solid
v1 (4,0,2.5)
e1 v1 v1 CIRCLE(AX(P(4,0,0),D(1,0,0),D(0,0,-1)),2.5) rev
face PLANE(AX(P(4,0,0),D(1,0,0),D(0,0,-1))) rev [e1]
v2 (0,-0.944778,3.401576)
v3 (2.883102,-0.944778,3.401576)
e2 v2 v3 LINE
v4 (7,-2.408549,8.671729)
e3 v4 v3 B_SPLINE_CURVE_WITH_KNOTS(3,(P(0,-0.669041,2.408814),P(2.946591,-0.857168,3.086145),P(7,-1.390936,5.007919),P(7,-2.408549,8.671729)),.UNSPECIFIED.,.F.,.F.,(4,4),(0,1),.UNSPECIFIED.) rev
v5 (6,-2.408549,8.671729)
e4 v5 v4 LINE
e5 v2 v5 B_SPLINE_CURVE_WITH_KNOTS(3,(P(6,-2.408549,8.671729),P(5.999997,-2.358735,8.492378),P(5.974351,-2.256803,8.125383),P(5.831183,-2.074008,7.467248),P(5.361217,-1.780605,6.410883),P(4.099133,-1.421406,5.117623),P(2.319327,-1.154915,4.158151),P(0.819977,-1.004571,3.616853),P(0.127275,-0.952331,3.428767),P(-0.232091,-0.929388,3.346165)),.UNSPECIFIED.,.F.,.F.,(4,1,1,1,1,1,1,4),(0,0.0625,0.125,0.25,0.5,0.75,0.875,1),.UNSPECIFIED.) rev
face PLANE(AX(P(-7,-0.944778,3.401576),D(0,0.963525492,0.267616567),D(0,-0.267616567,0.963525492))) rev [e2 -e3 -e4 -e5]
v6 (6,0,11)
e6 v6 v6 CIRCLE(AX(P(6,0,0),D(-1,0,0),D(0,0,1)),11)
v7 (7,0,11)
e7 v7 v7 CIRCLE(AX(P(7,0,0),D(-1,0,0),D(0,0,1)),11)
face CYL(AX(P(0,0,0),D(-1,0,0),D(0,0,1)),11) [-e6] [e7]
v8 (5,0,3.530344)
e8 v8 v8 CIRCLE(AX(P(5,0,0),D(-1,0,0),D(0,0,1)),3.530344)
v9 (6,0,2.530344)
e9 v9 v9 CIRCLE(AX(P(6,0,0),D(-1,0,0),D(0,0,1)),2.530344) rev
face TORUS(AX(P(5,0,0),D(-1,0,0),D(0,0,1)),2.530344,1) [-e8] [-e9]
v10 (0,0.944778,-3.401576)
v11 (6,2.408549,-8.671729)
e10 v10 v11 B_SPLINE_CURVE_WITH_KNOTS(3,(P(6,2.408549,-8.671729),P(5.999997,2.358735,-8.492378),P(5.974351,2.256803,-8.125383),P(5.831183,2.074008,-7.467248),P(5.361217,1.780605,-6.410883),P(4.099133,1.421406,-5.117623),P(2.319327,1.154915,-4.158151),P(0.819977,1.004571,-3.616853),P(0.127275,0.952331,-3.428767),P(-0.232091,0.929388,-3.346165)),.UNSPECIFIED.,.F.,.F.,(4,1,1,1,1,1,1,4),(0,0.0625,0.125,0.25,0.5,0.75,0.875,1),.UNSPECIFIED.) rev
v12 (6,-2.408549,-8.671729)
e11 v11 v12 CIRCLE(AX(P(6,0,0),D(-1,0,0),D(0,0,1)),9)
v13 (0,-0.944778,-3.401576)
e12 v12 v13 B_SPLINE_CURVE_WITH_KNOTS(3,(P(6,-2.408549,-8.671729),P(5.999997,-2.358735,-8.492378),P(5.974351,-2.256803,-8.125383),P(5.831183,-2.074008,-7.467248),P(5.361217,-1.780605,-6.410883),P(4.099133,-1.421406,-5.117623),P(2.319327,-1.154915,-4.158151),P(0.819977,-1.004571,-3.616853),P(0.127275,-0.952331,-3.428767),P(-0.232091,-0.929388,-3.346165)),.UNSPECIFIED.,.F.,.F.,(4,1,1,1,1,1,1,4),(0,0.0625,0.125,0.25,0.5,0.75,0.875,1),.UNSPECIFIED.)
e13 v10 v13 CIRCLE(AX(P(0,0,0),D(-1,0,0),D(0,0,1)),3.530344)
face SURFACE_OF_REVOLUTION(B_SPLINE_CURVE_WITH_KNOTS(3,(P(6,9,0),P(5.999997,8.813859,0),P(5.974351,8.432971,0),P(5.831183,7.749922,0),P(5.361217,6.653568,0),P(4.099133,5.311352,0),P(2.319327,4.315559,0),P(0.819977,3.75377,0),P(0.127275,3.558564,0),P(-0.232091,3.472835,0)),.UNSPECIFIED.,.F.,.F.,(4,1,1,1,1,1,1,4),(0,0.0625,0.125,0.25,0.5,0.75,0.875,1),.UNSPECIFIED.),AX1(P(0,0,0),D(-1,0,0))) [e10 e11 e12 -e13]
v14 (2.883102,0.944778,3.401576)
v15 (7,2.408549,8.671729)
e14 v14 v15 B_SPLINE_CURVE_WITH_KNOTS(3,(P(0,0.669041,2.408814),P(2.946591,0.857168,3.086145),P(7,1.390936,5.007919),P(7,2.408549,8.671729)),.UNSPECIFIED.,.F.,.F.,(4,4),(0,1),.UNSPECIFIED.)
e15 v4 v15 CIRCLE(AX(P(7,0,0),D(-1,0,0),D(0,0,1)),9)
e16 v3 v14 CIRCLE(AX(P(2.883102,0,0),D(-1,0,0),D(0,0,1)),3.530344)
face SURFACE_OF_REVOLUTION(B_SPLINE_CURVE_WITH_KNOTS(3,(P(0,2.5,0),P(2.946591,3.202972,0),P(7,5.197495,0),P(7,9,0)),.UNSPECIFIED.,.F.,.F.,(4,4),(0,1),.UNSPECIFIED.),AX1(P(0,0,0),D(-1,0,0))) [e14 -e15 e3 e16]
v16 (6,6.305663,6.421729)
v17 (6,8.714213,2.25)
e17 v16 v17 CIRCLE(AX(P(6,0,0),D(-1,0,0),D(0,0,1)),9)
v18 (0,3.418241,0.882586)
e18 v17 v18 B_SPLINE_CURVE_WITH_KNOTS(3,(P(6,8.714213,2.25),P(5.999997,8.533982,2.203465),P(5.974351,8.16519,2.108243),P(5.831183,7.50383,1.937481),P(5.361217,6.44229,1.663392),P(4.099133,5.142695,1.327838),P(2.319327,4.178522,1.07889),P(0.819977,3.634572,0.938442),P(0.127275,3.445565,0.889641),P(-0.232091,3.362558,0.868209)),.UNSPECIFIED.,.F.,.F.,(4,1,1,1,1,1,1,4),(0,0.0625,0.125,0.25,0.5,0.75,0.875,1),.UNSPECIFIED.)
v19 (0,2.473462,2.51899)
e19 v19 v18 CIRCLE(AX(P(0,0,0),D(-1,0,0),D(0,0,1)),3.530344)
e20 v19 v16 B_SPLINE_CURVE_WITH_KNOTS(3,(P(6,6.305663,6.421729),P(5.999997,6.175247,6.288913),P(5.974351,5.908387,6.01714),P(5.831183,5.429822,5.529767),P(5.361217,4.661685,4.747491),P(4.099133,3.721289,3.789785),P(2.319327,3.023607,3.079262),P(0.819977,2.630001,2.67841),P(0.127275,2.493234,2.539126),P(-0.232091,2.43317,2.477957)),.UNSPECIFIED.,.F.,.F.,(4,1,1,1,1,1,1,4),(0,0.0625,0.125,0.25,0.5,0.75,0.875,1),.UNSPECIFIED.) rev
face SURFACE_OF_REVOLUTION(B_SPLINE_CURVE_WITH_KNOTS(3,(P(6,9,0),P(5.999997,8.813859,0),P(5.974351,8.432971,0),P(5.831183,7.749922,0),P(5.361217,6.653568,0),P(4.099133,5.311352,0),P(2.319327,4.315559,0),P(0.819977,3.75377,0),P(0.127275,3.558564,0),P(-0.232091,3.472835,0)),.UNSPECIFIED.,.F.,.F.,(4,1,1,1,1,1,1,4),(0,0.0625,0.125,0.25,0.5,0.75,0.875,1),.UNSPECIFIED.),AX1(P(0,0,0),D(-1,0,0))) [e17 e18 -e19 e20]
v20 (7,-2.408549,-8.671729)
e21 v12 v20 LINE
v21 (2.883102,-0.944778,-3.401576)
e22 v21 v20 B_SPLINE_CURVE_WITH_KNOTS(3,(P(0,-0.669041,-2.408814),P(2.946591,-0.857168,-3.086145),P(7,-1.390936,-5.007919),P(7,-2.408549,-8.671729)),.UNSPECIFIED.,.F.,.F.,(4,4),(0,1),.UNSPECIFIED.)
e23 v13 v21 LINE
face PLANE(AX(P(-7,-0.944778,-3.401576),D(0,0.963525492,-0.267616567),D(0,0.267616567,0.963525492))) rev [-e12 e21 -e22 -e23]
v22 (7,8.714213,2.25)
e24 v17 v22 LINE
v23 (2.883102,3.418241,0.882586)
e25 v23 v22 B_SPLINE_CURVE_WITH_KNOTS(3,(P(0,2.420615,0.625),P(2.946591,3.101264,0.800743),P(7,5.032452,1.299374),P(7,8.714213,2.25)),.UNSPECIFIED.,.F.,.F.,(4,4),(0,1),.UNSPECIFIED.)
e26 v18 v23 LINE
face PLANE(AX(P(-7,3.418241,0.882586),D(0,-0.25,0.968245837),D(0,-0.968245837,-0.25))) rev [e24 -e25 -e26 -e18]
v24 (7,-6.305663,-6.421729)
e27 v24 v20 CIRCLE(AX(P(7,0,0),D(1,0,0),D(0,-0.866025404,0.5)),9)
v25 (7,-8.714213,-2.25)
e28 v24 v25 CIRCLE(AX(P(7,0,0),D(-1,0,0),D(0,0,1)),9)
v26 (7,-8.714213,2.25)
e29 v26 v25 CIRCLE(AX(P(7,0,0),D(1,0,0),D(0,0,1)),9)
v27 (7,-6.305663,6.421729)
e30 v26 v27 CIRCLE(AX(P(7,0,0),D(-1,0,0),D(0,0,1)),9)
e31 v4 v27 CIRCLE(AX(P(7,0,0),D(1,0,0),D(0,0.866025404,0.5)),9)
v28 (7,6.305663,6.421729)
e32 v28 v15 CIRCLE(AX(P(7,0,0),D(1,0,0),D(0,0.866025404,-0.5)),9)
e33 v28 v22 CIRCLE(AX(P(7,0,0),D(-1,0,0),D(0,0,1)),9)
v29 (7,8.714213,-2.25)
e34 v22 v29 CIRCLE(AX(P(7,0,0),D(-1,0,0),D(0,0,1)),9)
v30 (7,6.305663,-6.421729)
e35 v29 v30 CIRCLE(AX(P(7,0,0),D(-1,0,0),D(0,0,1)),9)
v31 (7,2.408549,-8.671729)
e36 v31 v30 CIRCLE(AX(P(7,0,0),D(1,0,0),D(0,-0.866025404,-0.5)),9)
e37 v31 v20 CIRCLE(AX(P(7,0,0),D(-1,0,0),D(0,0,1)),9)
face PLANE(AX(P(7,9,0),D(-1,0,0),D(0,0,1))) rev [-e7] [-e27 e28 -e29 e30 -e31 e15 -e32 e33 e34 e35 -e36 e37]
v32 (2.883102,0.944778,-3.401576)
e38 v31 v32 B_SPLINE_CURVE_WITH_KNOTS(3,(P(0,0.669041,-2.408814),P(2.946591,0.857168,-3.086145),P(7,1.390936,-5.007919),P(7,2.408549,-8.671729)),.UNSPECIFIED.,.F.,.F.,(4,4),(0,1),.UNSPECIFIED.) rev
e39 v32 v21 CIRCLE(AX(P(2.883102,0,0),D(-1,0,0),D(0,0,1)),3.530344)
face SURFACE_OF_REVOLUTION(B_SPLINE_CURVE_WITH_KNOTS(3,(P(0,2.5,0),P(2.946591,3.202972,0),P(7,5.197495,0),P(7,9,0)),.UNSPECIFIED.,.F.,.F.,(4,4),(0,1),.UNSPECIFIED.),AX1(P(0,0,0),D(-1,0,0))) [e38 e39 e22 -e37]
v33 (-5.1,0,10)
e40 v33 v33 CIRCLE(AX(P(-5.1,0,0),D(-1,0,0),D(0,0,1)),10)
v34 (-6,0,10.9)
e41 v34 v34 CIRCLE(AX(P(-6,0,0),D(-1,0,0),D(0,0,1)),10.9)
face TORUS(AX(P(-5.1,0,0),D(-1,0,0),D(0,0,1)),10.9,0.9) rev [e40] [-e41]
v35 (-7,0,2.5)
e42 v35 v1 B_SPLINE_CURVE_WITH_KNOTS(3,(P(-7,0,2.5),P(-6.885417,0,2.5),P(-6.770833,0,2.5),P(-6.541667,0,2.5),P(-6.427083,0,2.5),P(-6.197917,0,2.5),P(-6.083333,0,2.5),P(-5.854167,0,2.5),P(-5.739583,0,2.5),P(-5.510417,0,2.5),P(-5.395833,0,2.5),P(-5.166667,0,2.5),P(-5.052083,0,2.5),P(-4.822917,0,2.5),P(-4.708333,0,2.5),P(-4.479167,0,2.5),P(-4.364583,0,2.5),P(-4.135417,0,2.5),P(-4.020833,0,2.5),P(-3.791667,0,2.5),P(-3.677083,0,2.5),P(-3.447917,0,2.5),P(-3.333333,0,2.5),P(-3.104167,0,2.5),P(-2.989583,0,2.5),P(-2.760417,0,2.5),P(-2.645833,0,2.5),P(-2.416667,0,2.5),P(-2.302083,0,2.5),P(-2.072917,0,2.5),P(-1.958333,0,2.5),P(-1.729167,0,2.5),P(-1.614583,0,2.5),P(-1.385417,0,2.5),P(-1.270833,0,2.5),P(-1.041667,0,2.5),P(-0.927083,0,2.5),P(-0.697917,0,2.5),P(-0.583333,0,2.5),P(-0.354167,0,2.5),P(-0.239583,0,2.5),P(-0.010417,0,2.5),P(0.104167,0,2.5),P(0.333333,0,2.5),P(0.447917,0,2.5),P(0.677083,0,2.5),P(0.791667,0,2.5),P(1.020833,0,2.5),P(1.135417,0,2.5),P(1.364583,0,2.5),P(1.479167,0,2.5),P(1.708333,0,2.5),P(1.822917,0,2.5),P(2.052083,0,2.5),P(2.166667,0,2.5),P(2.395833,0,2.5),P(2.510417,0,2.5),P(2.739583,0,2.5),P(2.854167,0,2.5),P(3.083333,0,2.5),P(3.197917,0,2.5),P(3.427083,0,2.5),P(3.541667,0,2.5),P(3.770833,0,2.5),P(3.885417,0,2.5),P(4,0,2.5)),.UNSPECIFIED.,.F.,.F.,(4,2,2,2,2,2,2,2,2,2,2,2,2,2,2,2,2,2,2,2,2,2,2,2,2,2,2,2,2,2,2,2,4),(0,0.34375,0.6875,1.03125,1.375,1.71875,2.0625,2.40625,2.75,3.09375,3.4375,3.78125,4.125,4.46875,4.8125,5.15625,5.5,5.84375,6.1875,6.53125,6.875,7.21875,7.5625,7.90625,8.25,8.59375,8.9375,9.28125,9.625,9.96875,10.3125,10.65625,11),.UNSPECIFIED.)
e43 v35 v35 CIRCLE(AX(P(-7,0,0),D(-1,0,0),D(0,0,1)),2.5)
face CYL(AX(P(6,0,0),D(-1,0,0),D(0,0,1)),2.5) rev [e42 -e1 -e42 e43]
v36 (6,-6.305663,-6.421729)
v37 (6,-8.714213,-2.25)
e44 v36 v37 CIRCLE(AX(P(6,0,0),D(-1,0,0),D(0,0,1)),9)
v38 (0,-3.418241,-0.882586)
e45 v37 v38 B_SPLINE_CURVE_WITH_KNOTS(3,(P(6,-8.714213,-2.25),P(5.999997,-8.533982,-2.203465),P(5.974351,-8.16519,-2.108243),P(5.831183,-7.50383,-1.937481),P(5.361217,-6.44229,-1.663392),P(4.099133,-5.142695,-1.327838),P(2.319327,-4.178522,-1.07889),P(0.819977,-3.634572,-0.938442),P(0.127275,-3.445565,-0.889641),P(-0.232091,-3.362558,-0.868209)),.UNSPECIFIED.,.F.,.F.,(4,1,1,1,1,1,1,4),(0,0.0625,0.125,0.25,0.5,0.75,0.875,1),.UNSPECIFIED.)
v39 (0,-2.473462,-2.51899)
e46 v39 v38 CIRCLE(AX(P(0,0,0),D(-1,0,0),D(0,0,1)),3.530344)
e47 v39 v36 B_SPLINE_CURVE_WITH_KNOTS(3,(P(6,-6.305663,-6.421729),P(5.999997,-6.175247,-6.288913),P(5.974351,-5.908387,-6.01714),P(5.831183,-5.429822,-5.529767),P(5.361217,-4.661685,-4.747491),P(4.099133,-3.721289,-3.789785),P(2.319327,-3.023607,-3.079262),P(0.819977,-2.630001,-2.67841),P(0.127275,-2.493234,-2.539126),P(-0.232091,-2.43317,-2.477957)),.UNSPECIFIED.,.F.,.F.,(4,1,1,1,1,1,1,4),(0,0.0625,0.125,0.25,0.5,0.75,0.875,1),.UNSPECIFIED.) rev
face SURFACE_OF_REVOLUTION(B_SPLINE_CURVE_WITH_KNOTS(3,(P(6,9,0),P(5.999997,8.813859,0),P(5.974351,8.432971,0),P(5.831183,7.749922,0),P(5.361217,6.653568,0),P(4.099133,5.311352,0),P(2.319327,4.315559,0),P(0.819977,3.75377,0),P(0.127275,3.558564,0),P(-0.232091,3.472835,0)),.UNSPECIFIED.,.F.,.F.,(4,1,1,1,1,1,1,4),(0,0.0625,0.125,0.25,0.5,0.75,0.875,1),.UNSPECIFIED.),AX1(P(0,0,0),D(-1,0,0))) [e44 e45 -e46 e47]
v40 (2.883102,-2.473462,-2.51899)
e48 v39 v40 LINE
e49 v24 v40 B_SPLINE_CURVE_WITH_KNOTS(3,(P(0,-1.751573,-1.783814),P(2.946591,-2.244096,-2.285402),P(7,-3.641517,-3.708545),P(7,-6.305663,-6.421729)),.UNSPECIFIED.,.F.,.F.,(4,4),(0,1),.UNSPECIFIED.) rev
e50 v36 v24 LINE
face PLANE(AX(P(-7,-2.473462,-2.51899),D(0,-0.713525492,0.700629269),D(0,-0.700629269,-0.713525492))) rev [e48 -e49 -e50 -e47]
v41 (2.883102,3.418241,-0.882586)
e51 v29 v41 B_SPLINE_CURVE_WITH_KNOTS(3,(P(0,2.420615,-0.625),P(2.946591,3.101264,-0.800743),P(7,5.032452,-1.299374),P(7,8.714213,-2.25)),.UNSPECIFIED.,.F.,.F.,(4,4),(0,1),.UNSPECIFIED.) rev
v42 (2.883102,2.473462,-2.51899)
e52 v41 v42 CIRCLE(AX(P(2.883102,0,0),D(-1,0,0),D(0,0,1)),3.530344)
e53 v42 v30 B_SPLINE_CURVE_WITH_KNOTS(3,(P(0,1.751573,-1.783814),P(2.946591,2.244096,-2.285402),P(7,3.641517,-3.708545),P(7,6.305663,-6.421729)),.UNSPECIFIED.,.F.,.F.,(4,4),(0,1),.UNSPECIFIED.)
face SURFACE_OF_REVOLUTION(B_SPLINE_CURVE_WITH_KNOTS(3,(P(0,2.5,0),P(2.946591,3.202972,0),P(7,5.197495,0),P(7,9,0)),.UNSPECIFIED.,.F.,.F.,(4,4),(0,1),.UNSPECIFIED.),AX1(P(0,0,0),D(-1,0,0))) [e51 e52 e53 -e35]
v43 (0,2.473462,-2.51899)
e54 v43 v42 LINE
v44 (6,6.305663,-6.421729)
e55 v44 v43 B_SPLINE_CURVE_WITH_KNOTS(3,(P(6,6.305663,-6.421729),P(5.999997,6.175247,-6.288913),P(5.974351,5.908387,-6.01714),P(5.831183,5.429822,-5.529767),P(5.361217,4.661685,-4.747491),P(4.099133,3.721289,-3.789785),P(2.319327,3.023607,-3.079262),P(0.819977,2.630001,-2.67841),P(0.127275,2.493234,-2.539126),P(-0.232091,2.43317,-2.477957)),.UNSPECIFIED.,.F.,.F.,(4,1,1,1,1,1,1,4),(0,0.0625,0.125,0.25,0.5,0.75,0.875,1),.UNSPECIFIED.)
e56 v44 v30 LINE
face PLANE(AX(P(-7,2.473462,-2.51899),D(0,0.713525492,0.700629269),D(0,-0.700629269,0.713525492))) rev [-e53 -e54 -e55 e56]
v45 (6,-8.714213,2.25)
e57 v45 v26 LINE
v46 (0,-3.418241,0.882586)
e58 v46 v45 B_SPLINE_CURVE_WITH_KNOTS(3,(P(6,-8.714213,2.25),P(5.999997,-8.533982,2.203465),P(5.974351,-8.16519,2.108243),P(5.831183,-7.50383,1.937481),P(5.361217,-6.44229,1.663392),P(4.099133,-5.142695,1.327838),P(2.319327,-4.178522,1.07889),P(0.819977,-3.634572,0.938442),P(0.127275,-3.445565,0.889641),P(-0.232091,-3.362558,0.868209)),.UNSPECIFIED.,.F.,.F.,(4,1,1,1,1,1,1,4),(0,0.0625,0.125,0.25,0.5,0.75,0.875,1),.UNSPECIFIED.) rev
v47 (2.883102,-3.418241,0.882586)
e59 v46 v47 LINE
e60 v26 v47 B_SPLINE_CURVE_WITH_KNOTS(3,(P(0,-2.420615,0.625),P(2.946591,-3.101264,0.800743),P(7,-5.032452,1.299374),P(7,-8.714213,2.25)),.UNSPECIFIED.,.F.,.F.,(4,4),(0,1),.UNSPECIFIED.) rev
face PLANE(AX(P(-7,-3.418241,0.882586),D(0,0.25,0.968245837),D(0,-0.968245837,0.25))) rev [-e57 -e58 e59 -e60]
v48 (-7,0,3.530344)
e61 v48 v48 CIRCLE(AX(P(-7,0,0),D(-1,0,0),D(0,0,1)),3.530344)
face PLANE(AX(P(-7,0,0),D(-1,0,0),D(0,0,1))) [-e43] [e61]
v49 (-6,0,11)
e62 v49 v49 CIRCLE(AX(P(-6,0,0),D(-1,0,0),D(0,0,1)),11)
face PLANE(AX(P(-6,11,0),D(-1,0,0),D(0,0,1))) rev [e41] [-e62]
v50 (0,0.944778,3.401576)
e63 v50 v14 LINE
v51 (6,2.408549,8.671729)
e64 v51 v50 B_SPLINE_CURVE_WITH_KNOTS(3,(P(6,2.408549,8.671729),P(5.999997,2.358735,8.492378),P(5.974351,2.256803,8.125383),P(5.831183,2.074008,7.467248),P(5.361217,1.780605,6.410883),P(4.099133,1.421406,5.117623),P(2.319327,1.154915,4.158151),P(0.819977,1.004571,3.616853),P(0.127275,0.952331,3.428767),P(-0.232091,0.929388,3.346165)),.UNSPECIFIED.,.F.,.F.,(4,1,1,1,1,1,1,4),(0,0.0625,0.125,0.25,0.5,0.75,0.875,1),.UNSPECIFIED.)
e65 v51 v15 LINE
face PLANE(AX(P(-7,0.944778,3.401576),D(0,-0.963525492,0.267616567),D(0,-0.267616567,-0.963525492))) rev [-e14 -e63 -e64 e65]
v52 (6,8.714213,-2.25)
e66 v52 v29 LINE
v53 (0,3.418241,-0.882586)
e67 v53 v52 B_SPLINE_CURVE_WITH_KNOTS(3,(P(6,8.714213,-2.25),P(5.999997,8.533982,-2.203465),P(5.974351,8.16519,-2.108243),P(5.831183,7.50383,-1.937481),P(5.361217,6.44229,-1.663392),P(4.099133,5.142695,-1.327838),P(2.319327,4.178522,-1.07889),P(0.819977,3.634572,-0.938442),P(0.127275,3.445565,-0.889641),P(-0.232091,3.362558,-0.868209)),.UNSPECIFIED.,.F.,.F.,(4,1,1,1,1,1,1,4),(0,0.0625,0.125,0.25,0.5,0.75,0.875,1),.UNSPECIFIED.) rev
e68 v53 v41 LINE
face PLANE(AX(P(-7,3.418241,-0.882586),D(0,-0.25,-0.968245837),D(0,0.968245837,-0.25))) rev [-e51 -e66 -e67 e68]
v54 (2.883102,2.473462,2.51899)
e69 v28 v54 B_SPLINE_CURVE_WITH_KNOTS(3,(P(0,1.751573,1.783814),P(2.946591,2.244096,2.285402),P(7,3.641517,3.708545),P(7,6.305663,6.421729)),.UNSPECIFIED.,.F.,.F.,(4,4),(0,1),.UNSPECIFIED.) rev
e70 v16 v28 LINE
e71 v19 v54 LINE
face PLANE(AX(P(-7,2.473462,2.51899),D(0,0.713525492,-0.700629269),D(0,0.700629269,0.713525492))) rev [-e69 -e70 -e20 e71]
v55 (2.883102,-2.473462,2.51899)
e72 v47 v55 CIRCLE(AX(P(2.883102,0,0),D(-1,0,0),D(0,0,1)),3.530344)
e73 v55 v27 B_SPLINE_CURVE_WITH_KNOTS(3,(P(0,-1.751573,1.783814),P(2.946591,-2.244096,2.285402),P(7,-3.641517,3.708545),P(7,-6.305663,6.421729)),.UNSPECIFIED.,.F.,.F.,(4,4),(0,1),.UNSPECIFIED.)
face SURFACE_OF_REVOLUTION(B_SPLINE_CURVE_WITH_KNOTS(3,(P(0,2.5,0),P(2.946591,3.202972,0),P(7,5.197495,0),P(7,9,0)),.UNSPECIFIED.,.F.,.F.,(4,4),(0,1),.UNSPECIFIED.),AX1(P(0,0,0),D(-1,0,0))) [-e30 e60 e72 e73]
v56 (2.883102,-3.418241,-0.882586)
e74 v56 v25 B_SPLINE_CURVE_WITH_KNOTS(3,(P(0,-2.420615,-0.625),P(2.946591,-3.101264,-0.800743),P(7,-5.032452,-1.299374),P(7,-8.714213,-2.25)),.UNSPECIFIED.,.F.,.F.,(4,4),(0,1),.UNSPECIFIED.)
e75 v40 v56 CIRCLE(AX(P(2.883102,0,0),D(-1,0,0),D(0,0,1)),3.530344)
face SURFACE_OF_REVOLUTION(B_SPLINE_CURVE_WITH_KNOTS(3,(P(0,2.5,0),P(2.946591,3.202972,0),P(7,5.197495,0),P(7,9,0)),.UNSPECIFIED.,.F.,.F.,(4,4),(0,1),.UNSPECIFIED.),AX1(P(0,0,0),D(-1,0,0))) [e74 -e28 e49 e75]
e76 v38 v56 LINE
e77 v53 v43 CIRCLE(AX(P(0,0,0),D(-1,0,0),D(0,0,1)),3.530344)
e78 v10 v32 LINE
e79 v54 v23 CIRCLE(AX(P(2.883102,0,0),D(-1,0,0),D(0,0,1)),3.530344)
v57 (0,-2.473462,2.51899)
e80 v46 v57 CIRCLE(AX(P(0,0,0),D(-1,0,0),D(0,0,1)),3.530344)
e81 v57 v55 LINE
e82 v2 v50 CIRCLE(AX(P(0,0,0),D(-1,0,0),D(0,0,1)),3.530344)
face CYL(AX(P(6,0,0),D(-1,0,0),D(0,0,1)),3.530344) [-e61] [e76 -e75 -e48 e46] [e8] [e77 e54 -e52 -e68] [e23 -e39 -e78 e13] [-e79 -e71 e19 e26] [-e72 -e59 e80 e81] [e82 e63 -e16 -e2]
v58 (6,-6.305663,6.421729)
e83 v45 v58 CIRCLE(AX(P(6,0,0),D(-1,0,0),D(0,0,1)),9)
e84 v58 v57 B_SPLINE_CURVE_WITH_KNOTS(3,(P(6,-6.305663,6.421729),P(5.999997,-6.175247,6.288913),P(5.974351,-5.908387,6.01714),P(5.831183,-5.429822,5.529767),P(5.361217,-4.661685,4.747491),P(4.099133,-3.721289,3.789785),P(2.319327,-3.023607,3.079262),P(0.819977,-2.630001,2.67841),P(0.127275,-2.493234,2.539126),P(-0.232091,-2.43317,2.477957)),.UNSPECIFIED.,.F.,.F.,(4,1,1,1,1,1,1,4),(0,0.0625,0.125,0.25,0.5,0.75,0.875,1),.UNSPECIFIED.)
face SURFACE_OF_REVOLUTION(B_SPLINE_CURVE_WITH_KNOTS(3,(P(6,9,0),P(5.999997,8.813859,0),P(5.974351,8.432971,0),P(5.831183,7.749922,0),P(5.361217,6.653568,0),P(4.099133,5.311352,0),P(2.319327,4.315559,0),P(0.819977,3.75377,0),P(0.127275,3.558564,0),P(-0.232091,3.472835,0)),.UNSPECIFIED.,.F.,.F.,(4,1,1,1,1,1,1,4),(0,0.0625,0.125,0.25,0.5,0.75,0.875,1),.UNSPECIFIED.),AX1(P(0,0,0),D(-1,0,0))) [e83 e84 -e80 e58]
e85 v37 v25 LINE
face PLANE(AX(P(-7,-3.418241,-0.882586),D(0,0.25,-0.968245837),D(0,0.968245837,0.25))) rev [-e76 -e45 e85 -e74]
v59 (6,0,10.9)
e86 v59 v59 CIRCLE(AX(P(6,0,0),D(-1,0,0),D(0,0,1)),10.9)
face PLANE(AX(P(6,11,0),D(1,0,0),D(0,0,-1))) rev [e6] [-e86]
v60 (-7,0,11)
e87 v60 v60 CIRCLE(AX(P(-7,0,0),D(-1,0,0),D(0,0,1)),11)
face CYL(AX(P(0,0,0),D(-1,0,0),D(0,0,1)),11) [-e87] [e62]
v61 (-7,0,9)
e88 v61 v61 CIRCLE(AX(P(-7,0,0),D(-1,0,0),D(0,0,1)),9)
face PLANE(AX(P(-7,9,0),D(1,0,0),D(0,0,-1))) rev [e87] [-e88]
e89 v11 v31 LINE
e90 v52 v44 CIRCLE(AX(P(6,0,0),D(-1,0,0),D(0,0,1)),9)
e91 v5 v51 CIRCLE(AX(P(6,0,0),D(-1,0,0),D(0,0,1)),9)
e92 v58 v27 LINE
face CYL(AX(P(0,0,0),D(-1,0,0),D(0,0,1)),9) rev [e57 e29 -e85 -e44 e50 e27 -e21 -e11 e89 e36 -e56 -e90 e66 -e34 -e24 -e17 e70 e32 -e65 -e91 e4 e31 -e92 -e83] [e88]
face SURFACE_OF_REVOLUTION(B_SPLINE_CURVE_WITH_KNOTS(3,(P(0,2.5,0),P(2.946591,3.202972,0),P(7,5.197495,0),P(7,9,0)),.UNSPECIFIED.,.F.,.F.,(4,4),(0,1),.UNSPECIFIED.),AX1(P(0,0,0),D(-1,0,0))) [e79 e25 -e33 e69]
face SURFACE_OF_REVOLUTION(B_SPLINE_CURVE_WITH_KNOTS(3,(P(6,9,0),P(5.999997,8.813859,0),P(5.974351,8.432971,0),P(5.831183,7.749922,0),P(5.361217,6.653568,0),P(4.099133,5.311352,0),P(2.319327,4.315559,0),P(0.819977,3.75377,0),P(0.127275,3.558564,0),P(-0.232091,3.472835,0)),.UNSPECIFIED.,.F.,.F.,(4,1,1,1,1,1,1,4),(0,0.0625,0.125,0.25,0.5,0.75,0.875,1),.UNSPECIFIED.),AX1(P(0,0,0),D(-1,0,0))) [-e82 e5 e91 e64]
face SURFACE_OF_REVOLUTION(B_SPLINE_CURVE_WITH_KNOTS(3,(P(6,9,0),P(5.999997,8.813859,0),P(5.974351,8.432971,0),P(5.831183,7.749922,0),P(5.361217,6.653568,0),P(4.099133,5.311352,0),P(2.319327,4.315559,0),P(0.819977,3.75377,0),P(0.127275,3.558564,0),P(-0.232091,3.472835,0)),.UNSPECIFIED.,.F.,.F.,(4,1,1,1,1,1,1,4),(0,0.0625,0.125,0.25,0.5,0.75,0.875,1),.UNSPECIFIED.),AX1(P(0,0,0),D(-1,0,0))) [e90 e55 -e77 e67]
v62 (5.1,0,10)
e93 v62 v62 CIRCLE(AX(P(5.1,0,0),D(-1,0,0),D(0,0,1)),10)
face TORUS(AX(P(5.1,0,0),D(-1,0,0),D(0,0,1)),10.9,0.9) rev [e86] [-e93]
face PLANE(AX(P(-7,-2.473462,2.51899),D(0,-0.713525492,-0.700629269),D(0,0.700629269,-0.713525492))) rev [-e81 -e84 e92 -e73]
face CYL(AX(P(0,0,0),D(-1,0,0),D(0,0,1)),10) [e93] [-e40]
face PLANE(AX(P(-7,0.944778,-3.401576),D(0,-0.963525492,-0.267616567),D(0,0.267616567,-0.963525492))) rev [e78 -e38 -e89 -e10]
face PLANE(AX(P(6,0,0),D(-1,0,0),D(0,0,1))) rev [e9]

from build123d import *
from build123d.topology import SkipClean

# Parameters (mm, degrees)
REVOLVE1_OUTLINE_W  = 1
REVOLVE1_OUTLINE_H  = 1
SKETCH2_R           = 3.530343639
SKETCH2_R_2         = 2.5
BOSS_EXTRUDE1_DEPTH = 13
BOSS_EXTRUDE2_START = -2
SKETCH3_R           = 3.530343639
BOSS_EXTRUDE2_DEPTH = 2
CUT_EXTRUDE1_DEPTH  = 21.928449536
CIRPATTERN1_COUNT   = 6
FILLET1_R           = 1


# Read off the part's stored shape, not the designer's step: Revolve1
with BuildPart() as part:
    # Revolve1 outline → Revolve1 (revolve)
    with BuildSketch(Plane.YX):
        with BuildLine():
            add(Edge.make_bspline(
                [(2.5, 0), (2.716234195, 0.906371087), (3.054671918, 1.91746682), (3.530343639, 2.883101851)],
                knots=[0, 0, 0, 0, 0.307599927, 0.307599927, 0.307599927, 0.307599927], degree=3))
            Line((2.5, 0), (3.530343639, 0))
            Line((3.530343639, 0), (3.530343639, 2.883101851))
        make_face()
        with BuildLine():
            add(Edge.make_bspline(
                [(3.530343639, 2.883101851), (4.125497218, 4.091290439), (4.935485854, 5.228311877), (5.989749537, 6)],
                knots=[0.307599927, 0.307599927, 0.307599927, 0.307599927, 0.692464509, 0.692464509, 0.692464509, 0.692464509], degree=3))
            Line((3.530343639, 2.883101851), (3.530343639, 0))
            add(Edge.make_bspline(
                [(9, 6), (8.813858726, 5.999997286), (8.43297149, 5.974351341), (7.749922349, 5.831183314), (6.653568172, 5.361217178), (5.311352408, 4.099132984), (4.3155593, 2.31932682), (3.78420775, 0.901212892), (3.601875729, 0.278067654), (3.530343639, 0)],
                knots=[0, 0, 0, 0, 0.0625, 0.125, 0.25, 0.5, 0.75, 0.875, 0.972909743, 0.972909743, 0.972909743, 0.972909743], degree=3))
            Line((9, 6), (5.989749537, 6))
        make_face()
        with BuildLine():
            add(Edge.make_bspline(
                [(5.989749537, 6), (6.832184813, 6.616636338), (7.830594626, 7), (9, 7)],
                knots=[0.692464509, 0.692464509, 0.692464509, 0.692464509, 1, 1, 1, 1], degree=3))
            Line((5.989749537, 6), (9, 6))
            Line((9, 6), (9, 7))
        make_face()
        Polygon((10, 6), (9, 6), (9, 0), (10, 0), (10, 5.1), align=None)
        with Locations((9.5, 6.5)):
            Rectangle(REVOLVE1_OUTLINE_W, REVOLVE1_OUTLINE_H)
        Polygon((10, 0), (9, 0), (9, -7), (10, -7), (10, -5.1), align=None)
        with BuildLine():
            Line((10.9, 6), (10, 6))
            Line((10, 6), (10, 5.1))
            ThreePointArc((10, 5.1), (10.263603897, 5.736396103), (10.9, 6))
        make_face()
        Polygon((10, 7), (10, 6), (10.9, 6), (11, 6), (11, 7), align=None)
        with BuildLine():
            Line((10, -5.1), (10, -7))
            Line((10, -7), (11, -7))
            Line((11, -7), (11, -6))
            Line((11, -6), (10.9, -6))
            ThreePointArc((10.9, -6), (10.263603897, -5.736396103), (10, -5.1))
        make_face()
    revolve(axis=Axis((0, 0, 0), (1, 0, 0)))

    # Sketch2 → Boss-Extrude1 (add)
    with BuildSketch(Plane.ZY.offset(7)):
        Circle(SKETCH2_R)
        Circle(SKETCH2_R_2, mode=Mode.SUBTRACT)
    extrude(amount=-BOSS_EXTRUDE1_DEPTH)

    # Sketch3 → Boss-Extrude2 (add)
    with BuildSketch(Plane(origin=(6, 0, 0), x_dir=(0, 0, -1), z_dir=(1, 0, 0)).offset(BOSS_EXTRUDE2_START)):
        with Locations(Location((0, 0, 0), (0, 0, 180))):
            Circle(SKETCH3_R)
    extrude(amount=BOSS_EXTRUDE2_DEPTH)

    # Sketch4 → Cut-Extrude1 (cut, through all)
    with SkipClean():  # the faces are left unmerged after this step: merging them gives an invalid solid
        with BuildSketch(Plane(origin=(7, 0, 0), x_dir=(0, 0, -1), z_dir=(1, 0, 0))):
            with BuildLine():
                Line((-0.88258591, 3.41824053), (-2.25, 8.714212529))
                ThreePointArc((-2.25, 8.714212529), (0, 9), (2.25, 8.714212529))
                Line((2.25, 8.714212529), (0.88258591, 3.41824053))
                ThreePointArc((0.88258591, 3.41824053), (0, 3.530343639), (-0.88258591, 3.41824053))
            make_face()
        cut_extrude1 = extrude(amount=-CUT_EXTRUDE1_DEPTH, mode=Mode.SUBTRACT)
    add(part.part.scale(1), mode=Mode.REPLACE)  # the faces are merged on a copy

    # CirPattern1: Cut-Extrude1 ×6 about axis
    with SkipClean():  # the faces are left unmerged after this step: merging them gives an invalid solid
        cirpattern1_axis = Axis((0, 0, 0), (1, 0, 0))
        for i in range(1, CIRPATTERN1_COUNT):
            add(cut_extrude1.rotate(cirpattern1_axis, i * 360 / CIRPATTERN1_COUNT), mode=Mode.SUBTRACT)
    add(part.part.scale(1), mode=Mode.REPLACE)  # the faces are merged on a copy

    # Fillet1
    fillet1_edges = [part.edges().sort_by_distance(p)[0] for p in [
        (6, 3.267738298, 1.336118492),
    ]]
    fillet(fillet1_edges, radius=FILLET1_R)


solid = part.part
